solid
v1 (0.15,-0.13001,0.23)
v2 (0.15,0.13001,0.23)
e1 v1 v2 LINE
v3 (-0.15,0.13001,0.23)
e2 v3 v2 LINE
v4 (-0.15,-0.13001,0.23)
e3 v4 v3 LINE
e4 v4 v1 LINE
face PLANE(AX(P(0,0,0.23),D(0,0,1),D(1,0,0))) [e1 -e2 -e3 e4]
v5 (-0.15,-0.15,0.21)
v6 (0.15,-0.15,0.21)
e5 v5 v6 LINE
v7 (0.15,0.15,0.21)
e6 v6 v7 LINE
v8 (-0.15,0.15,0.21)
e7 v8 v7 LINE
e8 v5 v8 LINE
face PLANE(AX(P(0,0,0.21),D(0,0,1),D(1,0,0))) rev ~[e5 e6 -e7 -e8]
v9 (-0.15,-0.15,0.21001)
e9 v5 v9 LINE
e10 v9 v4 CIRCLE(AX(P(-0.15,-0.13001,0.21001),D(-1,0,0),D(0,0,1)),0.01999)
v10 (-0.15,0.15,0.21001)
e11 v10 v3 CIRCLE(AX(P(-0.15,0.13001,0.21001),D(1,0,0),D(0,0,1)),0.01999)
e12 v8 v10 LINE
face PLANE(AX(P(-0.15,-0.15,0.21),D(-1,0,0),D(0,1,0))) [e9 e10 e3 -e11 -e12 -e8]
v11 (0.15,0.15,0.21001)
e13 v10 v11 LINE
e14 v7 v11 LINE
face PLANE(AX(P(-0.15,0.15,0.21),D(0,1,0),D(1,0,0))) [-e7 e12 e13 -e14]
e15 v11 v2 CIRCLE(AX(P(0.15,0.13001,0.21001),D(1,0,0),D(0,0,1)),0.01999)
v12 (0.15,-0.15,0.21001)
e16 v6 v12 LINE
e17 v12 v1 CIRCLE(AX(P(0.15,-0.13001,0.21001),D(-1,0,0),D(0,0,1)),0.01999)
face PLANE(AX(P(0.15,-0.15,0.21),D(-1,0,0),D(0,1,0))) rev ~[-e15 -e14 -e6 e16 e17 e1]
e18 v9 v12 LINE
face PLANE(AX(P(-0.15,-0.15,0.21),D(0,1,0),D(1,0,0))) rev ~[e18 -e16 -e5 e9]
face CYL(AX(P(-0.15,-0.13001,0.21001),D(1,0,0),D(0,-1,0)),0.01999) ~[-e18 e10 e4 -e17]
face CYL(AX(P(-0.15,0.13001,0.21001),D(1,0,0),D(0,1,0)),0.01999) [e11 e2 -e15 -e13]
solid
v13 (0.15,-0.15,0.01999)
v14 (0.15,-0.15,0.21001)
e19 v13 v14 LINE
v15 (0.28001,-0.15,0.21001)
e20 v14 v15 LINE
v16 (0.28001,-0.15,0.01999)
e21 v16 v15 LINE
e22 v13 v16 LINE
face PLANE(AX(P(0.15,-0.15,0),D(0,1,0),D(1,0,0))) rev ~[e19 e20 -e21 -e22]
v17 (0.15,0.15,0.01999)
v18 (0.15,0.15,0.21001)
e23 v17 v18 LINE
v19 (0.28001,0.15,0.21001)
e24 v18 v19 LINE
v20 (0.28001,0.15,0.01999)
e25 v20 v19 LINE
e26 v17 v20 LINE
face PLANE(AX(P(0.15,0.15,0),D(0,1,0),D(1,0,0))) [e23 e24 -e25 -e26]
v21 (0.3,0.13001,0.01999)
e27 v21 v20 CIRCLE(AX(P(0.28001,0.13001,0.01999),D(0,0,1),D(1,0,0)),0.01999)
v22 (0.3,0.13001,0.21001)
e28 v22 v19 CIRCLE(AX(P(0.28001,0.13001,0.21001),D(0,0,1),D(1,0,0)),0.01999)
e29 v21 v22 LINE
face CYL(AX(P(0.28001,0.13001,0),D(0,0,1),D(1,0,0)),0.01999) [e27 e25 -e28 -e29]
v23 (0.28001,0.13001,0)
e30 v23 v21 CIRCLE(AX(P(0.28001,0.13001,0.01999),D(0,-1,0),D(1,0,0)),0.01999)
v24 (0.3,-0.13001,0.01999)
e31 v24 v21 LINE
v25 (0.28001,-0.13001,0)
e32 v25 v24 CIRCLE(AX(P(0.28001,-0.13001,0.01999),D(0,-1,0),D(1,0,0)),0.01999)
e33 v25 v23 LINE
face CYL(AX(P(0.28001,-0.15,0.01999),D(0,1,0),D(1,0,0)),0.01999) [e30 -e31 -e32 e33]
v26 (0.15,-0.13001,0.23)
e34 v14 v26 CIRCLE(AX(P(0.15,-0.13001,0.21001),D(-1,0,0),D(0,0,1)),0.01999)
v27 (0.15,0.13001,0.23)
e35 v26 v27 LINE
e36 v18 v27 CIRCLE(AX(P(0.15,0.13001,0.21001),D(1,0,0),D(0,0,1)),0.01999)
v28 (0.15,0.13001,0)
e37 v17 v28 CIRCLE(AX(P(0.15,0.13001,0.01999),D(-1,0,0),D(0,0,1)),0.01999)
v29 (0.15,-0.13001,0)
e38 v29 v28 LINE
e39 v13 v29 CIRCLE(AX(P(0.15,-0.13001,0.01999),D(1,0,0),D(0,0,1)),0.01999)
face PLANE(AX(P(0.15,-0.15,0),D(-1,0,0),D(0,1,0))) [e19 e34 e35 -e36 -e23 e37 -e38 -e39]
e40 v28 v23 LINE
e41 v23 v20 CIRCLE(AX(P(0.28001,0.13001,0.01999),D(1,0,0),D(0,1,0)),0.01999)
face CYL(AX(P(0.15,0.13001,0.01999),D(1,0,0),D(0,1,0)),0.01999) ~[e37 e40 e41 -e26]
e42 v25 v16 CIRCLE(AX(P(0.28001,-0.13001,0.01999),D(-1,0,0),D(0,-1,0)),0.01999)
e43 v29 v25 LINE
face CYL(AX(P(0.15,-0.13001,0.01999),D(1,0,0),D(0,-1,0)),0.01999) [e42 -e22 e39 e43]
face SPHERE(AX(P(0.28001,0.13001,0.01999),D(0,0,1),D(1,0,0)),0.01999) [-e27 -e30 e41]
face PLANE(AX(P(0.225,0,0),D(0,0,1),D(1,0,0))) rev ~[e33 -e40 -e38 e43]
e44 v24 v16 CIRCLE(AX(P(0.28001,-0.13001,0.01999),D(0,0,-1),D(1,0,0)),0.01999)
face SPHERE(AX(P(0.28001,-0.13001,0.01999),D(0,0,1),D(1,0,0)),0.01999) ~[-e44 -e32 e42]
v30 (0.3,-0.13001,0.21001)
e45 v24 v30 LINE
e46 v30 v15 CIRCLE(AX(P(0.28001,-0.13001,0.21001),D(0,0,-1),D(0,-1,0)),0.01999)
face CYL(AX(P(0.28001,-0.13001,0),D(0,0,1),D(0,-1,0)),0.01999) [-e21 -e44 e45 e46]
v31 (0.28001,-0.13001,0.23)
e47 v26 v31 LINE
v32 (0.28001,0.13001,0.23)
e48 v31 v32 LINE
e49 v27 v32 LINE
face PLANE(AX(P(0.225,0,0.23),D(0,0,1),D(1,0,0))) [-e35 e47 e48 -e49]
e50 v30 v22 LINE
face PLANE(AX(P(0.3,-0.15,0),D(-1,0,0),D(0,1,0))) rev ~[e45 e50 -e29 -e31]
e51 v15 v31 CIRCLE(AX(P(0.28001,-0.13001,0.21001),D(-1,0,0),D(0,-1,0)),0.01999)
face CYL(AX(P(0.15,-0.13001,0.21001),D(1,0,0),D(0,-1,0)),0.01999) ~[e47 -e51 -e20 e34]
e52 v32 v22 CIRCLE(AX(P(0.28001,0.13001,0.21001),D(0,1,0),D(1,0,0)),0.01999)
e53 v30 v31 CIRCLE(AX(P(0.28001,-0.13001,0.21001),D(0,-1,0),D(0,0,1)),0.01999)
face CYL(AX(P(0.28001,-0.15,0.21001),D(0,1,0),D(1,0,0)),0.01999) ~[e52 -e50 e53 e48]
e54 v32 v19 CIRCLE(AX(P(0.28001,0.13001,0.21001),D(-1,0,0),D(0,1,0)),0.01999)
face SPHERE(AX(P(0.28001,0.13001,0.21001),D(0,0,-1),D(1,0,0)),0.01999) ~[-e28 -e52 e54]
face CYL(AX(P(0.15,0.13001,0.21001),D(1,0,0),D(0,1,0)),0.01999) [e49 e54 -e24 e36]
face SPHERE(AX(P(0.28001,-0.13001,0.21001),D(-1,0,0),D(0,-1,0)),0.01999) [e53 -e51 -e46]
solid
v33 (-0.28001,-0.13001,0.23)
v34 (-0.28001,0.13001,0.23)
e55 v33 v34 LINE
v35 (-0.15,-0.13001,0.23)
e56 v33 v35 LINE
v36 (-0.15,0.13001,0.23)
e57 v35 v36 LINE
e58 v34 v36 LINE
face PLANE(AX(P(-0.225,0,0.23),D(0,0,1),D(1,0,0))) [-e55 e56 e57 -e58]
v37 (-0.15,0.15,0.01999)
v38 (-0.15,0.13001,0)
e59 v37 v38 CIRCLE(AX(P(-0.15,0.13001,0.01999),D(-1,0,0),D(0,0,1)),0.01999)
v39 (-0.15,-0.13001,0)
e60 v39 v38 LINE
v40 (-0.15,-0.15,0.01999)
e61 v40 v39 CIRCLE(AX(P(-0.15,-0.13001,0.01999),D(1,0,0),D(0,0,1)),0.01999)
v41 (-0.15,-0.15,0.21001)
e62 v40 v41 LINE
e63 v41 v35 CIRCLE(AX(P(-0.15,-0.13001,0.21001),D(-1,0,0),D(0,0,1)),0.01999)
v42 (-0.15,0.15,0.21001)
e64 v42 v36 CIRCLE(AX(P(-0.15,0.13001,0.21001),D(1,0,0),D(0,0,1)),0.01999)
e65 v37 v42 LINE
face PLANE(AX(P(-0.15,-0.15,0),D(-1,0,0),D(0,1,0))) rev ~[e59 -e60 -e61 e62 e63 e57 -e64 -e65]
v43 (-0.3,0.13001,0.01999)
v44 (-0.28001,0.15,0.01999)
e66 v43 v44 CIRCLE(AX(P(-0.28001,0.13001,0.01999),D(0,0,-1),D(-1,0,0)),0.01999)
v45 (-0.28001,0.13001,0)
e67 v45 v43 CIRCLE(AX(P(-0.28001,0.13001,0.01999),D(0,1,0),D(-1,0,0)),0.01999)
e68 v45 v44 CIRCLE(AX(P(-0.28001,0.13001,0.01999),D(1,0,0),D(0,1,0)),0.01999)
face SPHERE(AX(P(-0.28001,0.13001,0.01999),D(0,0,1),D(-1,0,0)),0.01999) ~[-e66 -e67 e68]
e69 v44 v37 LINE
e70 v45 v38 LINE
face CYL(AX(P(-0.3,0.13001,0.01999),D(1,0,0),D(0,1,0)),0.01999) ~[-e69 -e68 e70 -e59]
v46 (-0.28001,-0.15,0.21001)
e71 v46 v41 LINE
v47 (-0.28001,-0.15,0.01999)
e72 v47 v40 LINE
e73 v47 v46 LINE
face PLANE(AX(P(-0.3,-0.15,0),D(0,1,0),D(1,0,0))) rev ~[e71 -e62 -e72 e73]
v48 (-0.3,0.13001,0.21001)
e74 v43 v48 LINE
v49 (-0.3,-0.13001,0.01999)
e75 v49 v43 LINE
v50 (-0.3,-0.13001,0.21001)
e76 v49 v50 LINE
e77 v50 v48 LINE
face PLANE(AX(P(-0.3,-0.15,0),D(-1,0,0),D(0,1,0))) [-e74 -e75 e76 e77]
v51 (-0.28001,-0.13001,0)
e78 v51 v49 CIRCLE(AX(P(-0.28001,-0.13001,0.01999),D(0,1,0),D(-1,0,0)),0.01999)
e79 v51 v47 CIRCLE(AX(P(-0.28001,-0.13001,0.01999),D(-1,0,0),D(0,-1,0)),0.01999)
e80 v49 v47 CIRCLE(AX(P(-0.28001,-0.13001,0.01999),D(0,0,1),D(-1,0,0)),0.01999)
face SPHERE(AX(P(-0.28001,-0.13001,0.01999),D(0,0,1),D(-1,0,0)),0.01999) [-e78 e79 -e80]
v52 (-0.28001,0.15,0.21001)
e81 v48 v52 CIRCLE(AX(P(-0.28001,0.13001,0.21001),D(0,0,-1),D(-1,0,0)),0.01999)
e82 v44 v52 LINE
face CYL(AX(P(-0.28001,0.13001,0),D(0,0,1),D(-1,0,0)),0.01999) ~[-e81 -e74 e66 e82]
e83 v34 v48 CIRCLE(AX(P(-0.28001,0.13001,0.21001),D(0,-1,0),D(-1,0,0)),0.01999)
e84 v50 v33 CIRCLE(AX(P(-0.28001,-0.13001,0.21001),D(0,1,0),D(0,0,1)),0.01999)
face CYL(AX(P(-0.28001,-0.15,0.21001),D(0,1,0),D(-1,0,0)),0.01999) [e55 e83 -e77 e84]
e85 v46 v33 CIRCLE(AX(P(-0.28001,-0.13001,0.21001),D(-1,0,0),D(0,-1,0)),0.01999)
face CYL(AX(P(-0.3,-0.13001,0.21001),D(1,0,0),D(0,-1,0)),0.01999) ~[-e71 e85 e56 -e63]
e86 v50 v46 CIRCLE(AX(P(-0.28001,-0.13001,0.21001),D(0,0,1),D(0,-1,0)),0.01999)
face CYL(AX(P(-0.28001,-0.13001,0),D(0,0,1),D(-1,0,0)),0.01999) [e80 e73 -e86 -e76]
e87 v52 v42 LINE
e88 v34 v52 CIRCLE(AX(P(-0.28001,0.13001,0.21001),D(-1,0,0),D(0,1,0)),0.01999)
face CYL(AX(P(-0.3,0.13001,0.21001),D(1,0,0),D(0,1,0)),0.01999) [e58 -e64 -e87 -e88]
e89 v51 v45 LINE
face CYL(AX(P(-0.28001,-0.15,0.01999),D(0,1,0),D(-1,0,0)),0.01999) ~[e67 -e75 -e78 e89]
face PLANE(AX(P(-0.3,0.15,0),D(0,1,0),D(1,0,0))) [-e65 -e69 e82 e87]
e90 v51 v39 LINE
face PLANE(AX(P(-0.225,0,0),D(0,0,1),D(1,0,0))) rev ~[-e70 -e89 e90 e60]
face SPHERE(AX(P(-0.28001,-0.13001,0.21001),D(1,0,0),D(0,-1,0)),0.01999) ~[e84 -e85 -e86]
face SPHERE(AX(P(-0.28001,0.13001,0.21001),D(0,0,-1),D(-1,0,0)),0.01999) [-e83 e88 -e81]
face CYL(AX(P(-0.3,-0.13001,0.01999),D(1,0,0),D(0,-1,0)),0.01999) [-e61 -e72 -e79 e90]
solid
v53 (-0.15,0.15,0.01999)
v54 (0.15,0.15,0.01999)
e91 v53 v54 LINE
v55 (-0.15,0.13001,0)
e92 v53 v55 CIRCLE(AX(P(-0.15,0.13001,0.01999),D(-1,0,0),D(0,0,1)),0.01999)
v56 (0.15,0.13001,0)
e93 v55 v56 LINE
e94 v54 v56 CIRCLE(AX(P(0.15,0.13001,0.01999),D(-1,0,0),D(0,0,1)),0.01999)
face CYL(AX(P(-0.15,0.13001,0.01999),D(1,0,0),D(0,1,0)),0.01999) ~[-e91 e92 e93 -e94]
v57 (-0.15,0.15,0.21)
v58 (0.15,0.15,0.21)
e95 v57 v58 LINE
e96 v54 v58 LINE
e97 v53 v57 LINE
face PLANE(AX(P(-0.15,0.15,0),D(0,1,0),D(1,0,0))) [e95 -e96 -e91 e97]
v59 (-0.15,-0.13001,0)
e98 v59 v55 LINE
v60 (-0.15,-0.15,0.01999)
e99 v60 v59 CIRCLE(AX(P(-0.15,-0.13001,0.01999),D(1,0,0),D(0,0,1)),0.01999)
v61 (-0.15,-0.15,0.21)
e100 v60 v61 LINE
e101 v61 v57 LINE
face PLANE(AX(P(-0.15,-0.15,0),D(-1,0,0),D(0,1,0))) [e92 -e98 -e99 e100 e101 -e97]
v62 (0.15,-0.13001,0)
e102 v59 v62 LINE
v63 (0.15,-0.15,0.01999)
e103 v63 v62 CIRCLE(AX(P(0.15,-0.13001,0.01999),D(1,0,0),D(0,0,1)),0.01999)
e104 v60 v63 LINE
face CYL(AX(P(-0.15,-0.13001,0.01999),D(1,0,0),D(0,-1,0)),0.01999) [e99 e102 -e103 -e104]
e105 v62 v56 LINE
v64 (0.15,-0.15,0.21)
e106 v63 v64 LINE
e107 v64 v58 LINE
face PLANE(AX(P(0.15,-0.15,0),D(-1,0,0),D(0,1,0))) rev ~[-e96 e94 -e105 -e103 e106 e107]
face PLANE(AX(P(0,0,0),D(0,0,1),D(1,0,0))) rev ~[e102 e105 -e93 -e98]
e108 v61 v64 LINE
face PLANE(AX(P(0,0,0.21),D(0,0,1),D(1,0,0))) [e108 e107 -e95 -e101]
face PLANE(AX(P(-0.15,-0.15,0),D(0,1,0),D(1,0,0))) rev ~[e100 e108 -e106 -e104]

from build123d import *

# Parameters (mm, degrees)
F2_W     = 0.3
F2_H     = 0.3
F3_DEPTH = 0.21
F2_W_2   = 0.15
F4_DEPTH = 0.23
F5_DEPTH = 0.23
F6_DEPTH = 0.02
F7_R     = 0.01999
F7_2_R   = 0.01999
F7_3_R   = 0.01999
F7_4_R   = 0.01999


# Not quite as in the source:
# - a fillet or chamfer is up to 0.001 mm smaller than in the source, because OpenCascade refuses the exact size


with BuildPart() as f3:
    # F2 (on Top) → F3 (new body)
    with BuildSketch(Plane.XY):
        Rectangle(F2_W, F2_H)
    extrude(amount=F3_DEPTH)


with BuildPart() as f4:
    # F2 (on Top) → F4 (new body)
    with BuildSketch(Plane.XY):
        with Locations((-0.225, 0)):
            Rectangle(F2_W_2, F2_H)
    extrude(amount=F4_DEPTH)

    # F7 (radius 0.02 in the source; OpenCascade refuses exactly that, so slightly less here)
    f7_edges = [f4.edges().sort_by_distance(p)[0] for p in [
        (-0.225, -0.15, 0.23),
        (-0.3, 0.15, 0.115),
        (-0.3, -0.15, 0.115),
        (-0.3, 0, 0),
        (-0.3, 0, 0.23),
        (-0.225, 0.15, 0.23),
        (-0.225, 0.15, 0),
        (-0.225, -0.15, 0),
    ]]
    fillet(f7_edges, radius=F7_R)


with BuildPart() as f5:
    # F2 (on Top) → F5 (new body)
    with BuildSketch(Plane.XY):
        with Locations((0.225, 0)):
            Rectangle(F2_W_2, F2_H)
    extrude(amount=F5_DEPTH)

    # F7#2 (radius 0.02 in the source; OpenCascade refuses exactly that, so slightly less here)
    f7_2_edges = [f5.edges().sort_by_distance(p)[0] for p in [
        (0.225, -0.15, 0.23),
        (0.3, -0.15, 0.115),
        (0.3, 0.15, 0.115),
        (0.3, 0, 0),
        (0.3, 0, 0.23),
        (0.225, 0.15, 0.23),
        (0.225, 0.15, 0),
        (0.225, -0.15, 0),
    ]]
    fillet(f7_2_edges, radius=F7_2_R)


with BuildPart() as f6:
    # F6 (new): a face of the model
    f6_faces = [f3.part.faces().sort_by_distance(p)[0] for p in [
        (0, 0, 0.21),
    ]]
    extrude(f6_faces, amount=F6_DEPTH)

    # F7#4 (radius 0.02 in the source; OpenCascade refuses exactly that, so slightly less here)
    f7_4_edges = [f6.edges().sort_by_distance(p)[0] for p in [
        (0, -0.15, 0.23),
        (0, 0.15, 0.23),
    ]]
    fillet(f7_4_edges, radius=F7_4_R)


with BuildPart() as f3_1:
    add(f3.part)

    # F7#3 (radius 0.02 in the source; OpenCascade refuses exactly that, so slightly less here)
    f7_3_edges = [f3_1.edges().sort_by_distance(p)[0] for p in [
        (0, 0.15, 0),
        (0, -0.15, 0),
    ]]
    fillet(f7_3_edges, radius=F7_3_R)


solid = Compound([f4.part, f5.part, f6.part, f3_1.part])
